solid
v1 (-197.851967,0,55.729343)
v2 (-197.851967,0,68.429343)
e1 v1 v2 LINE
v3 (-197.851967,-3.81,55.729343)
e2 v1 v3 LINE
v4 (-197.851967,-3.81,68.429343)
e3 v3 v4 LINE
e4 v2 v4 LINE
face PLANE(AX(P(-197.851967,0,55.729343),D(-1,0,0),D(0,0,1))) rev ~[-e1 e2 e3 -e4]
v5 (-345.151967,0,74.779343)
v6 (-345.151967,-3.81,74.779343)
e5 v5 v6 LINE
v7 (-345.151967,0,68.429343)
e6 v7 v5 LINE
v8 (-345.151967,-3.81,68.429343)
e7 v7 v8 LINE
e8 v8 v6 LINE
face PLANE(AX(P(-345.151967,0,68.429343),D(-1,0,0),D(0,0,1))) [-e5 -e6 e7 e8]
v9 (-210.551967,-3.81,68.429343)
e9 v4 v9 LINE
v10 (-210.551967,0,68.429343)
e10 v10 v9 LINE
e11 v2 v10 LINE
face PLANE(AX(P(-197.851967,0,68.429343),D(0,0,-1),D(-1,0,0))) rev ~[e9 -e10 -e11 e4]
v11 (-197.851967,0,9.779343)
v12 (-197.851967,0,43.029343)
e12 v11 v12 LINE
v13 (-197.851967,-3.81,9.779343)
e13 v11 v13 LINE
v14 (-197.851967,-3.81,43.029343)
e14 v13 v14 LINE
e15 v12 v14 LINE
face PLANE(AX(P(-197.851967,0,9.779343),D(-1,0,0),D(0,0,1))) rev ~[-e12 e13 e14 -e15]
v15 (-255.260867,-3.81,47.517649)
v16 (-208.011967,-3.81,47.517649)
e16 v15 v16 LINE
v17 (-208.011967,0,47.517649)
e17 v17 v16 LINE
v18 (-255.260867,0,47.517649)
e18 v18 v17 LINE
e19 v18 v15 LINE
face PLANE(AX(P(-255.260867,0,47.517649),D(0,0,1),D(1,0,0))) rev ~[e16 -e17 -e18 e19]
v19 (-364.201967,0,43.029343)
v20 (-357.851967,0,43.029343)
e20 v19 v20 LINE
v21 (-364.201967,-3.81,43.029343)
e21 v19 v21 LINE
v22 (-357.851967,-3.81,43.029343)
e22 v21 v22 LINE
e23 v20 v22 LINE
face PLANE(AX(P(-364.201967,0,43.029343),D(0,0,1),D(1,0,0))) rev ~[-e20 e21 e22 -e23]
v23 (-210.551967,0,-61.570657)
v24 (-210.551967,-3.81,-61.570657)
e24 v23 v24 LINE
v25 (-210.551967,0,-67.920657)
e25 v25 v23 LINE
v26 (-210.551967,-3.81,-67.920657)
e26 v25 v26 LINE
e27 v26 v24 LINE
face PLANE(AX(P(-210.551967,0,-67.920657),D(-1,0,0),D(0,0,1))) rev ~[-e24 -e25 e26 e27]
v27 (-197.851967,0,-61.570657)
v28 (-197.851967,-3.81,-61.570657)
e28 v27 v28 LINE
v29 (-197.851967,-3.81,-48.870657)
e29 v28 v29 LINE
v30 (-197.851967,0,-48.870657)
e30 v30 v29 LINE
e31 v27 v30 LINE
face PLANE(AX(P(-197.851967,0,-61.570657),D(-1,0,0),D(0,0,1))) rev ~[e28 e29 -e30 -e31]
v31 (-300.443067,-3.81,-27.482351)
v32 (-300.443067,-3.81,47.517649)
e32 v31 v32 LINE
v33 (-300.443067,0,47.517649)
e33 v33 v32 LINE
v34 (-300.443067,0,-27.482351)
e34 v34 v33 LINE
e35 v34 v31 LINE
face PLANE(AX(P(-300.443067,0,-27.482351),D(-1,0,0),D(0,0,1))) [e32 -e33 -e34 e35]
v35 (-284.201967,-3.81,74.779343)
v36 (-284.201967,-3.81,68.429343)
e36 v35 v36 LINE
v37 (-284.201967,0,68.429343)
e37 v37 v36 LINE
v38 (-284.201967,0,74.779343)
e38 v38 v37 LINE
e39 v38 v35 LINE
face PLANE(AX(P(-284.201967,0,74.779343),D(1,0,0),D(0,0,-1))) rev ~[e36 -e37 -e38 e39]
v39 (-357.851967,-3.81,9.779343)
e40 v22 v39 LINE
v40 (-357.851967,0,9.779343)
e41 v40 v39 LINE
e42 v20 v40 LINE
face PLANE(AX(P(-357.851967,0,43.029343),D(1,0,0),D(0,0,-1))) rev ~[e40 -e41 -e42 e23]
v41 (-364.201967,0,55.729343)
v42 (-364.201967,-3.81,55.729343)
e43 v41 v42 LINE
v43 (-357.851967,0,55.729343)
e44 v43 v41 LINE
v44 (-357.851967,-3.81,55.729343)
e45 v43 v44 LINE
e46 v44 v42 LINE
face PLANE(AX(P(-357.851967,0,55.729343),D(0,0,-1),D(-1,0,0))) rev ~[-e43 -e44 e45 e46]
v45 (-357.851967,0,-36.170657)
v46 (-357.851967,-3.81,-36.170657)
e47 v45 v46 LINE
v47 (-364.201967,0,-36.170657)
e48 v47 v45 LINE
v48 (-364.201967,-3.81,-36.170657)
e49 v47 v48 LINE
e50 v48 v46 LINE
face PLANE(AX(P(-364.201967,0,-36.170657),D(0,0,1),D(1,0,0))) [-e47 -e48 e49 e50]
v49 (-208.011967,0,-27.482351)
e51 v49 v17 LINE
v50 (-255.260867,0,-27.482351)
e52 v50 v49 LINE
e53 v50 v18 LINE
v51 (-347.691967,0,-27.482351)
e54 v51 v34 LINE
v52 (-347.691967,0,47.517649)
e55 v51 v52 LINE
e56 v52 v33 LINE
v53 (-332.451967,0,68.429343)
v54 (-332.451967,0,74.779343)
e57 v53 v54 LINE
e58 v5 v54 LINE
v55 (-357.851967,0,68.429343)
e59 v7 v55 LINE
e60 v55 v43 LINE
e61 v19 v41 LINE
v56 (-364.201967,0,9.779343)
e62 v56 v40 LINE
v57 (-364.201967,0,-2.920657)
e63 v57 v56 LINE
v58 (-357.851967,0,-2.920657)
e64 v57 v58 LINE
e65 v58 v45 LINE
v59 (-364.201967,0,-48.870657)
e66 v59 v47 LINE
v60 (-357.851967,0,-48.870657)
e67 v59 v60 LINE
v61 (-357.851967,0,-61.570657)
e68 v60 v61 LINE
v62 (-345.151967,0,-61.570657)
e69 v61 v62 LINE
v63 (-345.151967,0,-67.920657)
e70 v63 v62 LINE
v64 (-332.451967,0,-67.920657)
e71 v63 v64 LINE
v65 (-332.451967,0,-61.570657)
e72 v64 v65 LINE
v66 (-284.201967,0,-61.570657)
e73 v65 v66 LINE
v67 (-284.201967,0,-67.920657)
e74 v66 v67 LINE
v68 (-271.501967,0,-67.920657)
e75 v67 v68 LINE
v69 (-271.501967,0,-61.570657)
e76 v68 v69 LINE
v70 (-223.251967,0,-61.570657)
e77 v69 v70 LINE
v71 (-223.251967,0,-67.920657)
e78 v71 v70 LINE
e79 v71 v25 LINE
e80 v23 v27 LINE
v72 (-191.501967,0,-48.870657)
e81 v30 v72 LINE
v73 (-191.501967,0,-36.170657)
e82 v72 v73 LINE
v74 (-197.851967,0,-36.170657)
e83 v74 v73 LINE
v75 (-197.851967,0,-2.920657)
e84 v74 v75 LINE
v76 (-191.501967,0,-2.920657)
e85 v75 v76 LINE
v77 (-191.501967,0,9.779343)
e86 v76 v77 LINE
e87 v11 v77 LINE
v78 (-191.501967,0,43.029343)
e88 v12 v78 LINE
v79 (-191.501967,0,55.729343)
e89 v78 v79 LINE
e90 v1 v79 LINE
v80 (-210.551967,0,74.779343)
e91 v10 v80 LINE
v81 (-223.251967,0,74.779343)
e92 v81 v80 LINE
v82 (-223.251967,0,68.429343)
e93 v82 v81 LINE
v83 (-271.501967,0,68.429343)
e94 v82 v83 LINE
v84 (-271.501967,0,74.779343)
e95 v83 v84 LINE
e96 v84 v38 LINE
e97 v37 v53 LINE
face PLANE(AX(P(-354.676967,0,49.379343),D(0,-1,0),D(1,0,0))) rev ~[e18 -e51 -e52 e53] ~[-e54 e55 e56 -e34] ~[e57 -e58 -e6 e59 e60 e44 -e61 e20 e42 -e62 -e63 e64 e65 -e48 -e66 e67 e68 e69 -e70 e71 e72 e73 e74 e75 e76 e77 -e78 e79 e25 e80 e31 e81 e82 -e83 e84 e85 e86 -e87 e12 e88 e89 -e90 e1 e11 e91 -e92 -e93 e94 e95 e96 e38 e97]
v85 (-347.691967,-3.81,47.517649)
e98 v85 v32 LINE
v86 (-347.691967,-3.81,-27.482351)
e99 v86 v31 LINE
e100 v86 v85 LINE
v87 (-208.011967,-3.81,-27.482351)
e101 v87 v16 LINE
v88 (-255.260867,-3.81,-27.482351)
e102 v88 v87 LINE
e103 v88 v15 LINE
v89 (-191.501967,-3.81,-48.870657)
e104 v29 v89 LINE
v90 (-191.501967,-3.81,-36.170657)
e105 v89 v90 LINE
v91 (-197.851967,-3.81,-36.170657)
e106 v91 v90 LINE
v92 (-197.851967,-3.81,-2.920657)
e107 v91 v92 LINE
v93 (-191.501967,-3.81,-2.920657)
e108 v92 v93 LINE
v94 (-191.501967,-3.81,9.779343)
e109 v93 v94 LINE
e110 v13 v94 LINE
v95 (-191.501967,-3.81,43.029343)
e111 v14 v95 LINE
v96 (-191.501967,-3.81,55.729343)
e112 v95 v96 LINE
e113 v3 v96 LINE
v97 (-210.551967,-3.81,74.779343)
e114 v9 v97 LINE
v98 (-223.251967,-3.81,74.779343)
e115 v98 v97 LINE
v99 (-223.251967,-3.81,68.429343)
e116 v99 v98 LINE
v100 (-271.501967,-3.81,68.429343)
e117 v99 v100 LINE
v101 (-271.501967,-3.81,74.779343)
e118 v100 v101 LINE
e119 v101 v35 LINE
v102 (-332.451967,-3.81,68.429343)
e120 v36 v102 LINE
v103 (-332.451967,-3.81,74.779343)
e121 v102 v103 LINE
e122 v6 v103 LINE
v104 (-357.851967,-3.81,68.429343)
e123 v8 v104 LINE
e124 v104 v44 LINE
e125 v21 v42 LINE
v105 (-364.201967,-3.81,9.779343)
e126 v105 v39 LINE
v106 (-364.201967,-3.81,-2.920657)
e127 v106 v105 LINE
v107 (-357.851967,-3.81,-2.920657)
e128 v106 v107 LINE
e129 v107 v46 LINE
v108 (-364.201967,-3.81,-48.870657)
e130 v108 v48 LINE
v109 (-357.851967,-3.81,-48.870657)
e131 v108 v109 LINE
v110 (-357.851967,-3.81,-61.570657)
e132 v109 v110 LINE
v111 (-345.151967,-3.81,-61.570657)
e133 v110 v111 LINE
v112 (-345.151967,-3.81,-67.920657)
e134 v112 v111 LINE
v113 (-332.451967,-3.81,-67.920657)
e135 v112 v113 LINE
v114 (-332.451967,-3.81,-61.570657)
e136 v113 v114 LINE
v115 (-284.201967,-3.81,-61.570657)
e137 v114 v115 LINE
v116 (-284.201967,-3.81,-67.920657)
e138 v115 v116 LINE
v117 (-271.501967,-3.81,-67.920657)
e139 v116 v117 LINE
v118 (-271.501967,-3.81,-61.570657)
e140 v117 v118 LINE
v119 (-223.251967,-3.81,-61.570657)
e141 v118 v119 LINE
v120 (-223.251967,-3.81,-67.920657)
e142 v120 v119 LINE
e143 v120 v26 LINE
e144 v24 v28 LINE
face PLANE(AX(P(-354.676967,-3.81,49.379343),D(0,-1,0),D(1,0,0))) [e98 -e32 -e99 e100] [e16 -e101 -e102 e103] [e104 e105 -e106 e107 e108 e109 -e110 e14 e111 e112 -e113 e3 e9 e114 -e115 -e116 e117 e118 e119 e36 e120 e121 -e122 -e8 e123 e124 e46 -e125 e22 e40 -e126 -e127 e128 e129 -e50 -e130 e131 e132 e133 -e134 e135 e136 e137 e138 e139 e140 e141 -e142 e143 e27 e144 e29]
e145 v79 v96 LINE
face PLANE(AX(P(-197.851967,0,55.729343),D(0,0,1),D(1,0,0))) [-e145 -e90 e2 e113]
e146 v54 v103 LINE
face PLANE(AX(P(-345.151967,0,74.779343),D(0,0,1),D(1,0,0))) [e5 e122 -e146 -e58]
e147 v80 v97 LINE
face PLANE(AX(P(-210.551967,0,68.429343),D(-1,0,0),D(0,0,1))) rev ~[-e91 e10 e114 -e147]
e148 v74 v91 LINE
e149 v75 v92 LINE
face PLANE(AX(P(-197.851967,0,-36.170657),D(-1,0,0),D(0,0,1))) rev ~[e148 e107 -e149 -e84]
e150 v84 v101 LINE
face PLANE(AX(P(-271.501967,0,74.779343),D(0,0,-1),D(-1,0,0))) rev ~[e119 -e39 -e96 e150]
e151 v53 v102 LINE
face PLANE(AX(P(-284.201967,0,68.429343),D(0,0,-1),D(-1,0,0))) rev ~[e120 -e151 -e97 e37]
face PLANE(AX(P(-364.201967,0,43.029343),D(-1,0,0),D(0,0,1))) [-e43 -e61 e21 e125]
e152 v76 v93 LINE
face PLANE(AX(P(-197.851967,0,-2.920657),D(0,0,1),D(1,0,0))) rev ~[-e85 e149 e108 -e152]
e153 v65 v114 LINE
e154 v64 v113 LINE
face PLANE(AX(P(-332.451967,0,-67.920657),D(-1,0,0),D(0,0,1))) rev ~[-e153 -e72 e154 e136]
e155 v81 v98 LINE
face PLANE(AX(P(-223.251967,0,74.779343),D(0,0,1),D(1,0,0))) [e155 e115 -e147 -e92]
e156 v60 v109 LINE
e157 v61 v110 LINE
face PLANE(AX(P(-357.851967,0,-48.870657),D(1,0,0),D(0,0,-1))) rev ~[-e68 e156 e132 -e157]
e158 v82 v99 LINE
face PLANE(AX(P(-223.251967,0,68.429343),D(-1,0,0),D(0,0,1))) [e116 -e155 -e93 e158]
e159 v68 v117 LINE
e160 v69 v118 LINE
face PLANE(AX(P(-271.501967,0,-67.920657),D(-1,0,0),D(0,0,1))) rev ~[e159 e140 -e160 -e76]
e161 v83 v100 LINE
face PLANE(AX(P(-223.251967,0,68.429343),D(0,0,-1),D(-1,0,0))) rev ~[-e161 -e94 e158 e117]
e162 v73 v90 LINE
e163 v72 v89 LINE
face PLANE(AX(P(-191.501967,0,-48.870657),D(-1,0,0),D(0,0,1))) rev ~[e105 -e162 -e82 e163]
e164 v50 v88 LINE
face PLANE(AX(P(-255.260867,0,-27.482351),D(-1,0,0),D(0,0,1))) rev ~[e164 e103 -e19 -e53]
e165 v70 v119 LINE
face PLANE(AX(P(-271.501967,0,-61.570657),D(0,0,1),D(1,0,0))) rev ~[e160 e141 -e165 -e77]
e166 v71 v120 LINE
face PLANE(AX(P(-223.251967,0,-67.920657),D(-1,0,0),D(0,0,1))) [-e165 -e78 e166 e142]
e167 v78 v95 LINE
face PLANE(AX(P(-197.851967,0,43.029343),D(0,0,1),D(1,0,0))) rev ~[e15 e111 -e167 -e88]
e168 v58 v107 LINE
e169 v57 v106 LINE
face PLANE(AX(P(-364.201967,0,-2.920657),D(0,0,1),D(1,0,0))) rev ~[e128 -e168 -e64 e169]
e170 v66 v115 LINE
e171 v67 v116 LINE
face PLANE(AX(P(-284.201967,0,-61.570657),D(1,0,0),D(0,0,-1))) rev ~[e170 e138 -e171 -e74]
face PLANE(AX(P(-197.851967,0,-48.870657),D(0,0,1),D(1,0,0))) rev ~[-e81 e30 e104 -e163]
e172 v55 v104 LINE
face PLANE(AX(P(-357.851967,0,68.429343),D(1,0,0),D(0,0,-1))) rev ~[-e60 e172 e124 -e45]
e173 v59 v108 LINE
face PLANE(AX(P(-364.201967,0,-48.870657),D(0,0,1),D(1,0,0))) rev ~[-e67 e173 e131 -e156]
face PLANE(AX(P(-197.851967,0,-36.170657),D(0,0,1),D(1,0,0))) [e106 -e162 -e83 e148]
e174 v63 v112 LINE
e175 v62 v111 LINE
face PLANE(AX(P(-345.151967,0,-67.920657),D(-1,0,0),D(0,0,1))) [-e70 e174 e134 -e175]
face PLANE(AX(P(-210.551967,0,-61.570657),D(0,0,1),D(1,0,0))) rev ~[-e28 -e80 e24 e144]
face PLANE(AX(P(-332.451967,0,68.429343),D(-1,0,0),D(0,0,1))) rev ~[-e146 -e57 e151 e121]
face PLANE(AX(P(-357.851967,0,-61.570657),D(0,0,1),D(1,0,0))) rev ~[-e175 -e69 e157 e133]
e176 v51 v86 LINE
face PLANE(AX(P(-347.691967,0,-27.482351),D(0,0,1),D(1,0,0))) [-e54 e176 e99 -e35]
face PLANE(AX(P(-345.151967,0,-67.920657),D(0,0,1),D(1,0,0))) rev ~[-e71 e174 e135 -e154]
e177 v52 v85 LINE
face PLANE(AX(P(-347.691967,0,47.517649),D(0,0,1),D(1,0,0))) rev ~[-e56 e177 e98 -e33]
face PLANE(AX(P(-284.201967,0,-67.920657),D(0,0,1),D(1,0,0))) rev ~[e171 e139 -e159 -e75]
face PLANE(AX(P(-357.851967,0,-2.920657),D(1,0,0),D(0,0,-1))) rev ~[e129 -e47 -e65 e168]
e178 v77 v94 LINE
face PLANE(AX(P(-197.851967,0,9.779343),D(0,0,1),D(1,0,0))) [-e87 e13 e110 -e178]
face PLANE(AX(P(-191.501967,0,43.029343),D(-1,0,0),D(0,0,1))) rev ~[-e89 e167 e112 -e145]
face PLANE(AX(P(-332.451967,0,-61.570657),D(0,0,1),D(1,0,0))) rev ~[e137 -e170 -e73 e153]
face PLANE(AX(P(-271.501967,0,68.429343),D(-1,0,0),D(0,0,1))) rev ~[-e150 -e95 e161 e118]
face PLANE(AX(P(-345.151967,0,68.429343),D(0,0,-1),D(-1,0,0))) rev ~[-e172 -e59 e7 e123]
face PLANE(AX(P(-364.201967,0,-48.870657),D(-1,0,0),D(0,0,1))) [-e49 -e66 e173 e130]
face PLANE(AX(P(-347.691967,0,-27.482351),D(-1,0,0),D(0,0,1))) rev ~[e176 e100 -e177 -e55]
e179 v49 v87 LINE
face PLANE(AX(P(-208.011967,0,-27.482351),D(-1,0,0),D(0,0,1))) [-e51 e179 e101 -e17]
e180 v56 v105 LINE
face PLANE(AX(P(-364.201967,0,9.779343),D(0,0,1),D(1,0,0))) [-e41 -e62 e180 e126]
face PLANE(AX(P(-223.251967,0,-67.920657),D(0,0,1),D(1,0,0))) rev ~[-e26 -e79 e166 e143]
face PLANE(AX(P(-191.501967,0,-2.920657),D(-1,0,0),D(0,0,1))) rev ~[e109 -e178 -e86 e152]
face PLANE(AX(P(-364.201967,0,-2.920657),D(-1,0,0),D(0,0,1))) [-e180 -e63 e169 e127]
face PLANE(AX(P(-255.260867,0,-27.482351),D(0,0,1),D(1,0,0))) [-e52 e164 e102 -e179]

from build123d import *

# Parameters (mm, degrees)
F0_W     = 6.35
F0_H     = 12.7
F0_W_2   = 47.2488999367
F0_H_2   = 75
F0_W_3   = 12.7
F0_H_3   = 6.35
F1_DEPTH = 3.81


# Not quite as in the source:
# - a feature names something its author has since deleted; it is built from what else it names


with BuildPart() as f1:
    # F0 (on Front) → F1 (new body)
    with BuildSketch(Plane.XZ):
        with Locations((-354.6769669852, 49.3793434303)):
            Rectangle(F0_W, F0_H)
        with Locations((-361.0269669852, 49.3793434303)):
            Rectangle(F0_W, F0_H)
        Polygon((-332.4519669852, -61.5706565697), (-284.2019669852, -61.5706565697), (-284.2019669852, -55.2206565697), (-277.8519669852, -55.2206565697), (-277.8519669852, 62.0793434303), (-284.2019669852, 62.0793434303), (-284.2019669852, 68.4293434303), (-332.4519669852, 68.4293434303), (-332.4519669852, 62.0793434303), (-345.1519669852, 62.0793434303), (-345.1519669852, 68.4293434303), (-357.8519669852, 68.4293434303), (-357.8519669852, 55.7293434303), (-351.5019669852, 55.7293434303), (-351.5019669852, 43.0293434303), (-357.8519669852, 43.0293434303), (-357.8519669852, 9.7793434303), (-351.5019669852, 9.7793434303), (-351.5019669852, -2.9206565697), (-357.8519669852, -2.9206565697), (-357.8519669852, -36.1706565697), (-351.5019669852, -36.1706565697), (-351.5019669852, -48.8706565697), (-357.8519669852, -48.8706565697), (-357.8519669852, -61.5706565697), (-345.1519669852, -61.5706565697), (-345.1519669852, -55.2206565697), (-332.4519669852, -55.2206565697), align=None)
        with Locations((-324.0675170169, 10.0176490168)):
            Rectangle(F0_W_2, F0_H_2, mode=Mode.SUBTRACT)
        with Locations((-338.8019669852, 65.2543434303)):
            Rectangle(F0_W_3, F0_H_3)
        with Locations((-338.8019669852, 71.6043434303)):
            Rectangle(F0_W_3, F0_H_3)
        Polygon((-210.5519669852, -61.5706565697), (-197.8519669852, -61.5706565697), (-197.8519669852, -48.8706565697), (-204.2019669852, -48.8706565697), (-204.2019669852, -36.1706565697), (-197.8519669852, -36.1706565697), (-197.8519669852, -2.9206565697), (-204.2019669852, -2.9206565697), (-204.2019669852, 9.7793434303), (-197.8519669852, 9.7793434303), (-197.8519669852, 43.0293434303), (-204.2019669852, 43.0293434303), (-204.2019669852, 55.7293434303), (-197.8519669852, 55.7293434303), (-197.8519669852, 68.4293434303), (-210.5519669852, 68.4293434303), (-210.5519669852, 62.0793434303), (-223.2519669852, 62.0793434303), (-223.2519669852, 68.4293434303), (-271.5019669852, 68.4293434303), (-271.5019669852, 62.0793434303), (-277.8519669852, 62.0793434303), (-277.8519669852, -55.2206565697), (-271.5019669852, -55.2206565697), (-271.5019669852, -61.5706565697), (-223.2519669852, -61.5706565697), (-223.2519669852, -55.2206565697), (-210.5519669852, -55.2206565697), align=None)
        with Locations((-231.6364169536, 10.0176490168)):
            Rectangle(F0_W_2, F0_H_2, mode=Mode.SUBTRACT)
        Polygon((-284.2019669852, 68.4293434303), (-277.8519669852, 68.4293434303), (-271.5019669852, 68.4293434303), (-271.5019669852, 74.7793434303), (-284.2019669852, 74.7793434303), align=None)
        with Locations((-274.6769669852, 65.2543434303)):
            Rectangle(F0_W, F0_H_3)
        with Locations((-281.0269669852, 65.2543434303)):
            Rectangle(F0_W, F0_H_3)
        with Locations((-216.9019669852, 71.6043434303)):
            Rectangle(F0_W_3, F0_H_3)
        with Locations((-216.9019669852, 65.2543434303)):
            Rectangle(F0_W_3, F0_H_3)
        with Locations((-354.6769669852, 3.4293434303)):
            Rectangle(F0_W, F0_H)
        with Locations((-361.0269669852, 3.4293434303)):
            Rectangle(F0_W, F0_H)
        with Locations((-361.0269669852, -42.5206565697)):
            Rectangle(F0_W, F0_H)
        with Locations((-338.8019669852, -64.7456565697)):
            Rectangle(F0_W_3, F0_H_3)
        with Locations((-354.6769669852, -42.5206565697)):
            Rectangle(F0_W, F0_H)
        with Locations((-338.8019669852, -58.3956565697)):
            Rectangle(F0_W_3, F0_H_3)
        with Locations((-281.0269669852, -58.3956565697)):
            Rectangle(F0_W, F0_H_3)
        with Locations((-274.6769669852, -58.3956565697)):
            Rectangle(F0_W, F0_H_3)
        Polygon((-271.5019669852, -67.9206565697), (-271.5019669852, -61.5706565697), (-277.8519669852, -61.5706565697), (-284.2019669852, -61.5706565697), (-284.2019669852, -67.9206565697), align=None)
        with Locations((-216.9019669852, -64.7456565697)):
            Rectangle(F0_W_3, F0_H_3)
        with Locations((-216.9019669852, -58.3956565697)):
            Rectangle(F0_W_3, F0_H_3)
        with Locations((-201.0269669852, -42.5206565697)):
            Rectangle(F0_W, F0_H)
        with Locations((-194.6769669852, -42.5206565697)):
            Rectangle(F0_W, F0_H)
        with Locations((-201.0269669852, 3.4293434303)):
            Rectangle(F0_W, F0_H)
        with Locations((-194.6769669852, 3.4293434303)):
            Rectangle(F0_W, F0_H)
        with Locations((-201.0269669852, 49.3793434303)):
            Rectangle(F0_W, F0_H)
        with Locations((-194.6769669852, 49.3793434303)):
            Rectangle(F0_W, F0_H)
    extrude(amount=F1_DEPTH)


solid = f1.part
